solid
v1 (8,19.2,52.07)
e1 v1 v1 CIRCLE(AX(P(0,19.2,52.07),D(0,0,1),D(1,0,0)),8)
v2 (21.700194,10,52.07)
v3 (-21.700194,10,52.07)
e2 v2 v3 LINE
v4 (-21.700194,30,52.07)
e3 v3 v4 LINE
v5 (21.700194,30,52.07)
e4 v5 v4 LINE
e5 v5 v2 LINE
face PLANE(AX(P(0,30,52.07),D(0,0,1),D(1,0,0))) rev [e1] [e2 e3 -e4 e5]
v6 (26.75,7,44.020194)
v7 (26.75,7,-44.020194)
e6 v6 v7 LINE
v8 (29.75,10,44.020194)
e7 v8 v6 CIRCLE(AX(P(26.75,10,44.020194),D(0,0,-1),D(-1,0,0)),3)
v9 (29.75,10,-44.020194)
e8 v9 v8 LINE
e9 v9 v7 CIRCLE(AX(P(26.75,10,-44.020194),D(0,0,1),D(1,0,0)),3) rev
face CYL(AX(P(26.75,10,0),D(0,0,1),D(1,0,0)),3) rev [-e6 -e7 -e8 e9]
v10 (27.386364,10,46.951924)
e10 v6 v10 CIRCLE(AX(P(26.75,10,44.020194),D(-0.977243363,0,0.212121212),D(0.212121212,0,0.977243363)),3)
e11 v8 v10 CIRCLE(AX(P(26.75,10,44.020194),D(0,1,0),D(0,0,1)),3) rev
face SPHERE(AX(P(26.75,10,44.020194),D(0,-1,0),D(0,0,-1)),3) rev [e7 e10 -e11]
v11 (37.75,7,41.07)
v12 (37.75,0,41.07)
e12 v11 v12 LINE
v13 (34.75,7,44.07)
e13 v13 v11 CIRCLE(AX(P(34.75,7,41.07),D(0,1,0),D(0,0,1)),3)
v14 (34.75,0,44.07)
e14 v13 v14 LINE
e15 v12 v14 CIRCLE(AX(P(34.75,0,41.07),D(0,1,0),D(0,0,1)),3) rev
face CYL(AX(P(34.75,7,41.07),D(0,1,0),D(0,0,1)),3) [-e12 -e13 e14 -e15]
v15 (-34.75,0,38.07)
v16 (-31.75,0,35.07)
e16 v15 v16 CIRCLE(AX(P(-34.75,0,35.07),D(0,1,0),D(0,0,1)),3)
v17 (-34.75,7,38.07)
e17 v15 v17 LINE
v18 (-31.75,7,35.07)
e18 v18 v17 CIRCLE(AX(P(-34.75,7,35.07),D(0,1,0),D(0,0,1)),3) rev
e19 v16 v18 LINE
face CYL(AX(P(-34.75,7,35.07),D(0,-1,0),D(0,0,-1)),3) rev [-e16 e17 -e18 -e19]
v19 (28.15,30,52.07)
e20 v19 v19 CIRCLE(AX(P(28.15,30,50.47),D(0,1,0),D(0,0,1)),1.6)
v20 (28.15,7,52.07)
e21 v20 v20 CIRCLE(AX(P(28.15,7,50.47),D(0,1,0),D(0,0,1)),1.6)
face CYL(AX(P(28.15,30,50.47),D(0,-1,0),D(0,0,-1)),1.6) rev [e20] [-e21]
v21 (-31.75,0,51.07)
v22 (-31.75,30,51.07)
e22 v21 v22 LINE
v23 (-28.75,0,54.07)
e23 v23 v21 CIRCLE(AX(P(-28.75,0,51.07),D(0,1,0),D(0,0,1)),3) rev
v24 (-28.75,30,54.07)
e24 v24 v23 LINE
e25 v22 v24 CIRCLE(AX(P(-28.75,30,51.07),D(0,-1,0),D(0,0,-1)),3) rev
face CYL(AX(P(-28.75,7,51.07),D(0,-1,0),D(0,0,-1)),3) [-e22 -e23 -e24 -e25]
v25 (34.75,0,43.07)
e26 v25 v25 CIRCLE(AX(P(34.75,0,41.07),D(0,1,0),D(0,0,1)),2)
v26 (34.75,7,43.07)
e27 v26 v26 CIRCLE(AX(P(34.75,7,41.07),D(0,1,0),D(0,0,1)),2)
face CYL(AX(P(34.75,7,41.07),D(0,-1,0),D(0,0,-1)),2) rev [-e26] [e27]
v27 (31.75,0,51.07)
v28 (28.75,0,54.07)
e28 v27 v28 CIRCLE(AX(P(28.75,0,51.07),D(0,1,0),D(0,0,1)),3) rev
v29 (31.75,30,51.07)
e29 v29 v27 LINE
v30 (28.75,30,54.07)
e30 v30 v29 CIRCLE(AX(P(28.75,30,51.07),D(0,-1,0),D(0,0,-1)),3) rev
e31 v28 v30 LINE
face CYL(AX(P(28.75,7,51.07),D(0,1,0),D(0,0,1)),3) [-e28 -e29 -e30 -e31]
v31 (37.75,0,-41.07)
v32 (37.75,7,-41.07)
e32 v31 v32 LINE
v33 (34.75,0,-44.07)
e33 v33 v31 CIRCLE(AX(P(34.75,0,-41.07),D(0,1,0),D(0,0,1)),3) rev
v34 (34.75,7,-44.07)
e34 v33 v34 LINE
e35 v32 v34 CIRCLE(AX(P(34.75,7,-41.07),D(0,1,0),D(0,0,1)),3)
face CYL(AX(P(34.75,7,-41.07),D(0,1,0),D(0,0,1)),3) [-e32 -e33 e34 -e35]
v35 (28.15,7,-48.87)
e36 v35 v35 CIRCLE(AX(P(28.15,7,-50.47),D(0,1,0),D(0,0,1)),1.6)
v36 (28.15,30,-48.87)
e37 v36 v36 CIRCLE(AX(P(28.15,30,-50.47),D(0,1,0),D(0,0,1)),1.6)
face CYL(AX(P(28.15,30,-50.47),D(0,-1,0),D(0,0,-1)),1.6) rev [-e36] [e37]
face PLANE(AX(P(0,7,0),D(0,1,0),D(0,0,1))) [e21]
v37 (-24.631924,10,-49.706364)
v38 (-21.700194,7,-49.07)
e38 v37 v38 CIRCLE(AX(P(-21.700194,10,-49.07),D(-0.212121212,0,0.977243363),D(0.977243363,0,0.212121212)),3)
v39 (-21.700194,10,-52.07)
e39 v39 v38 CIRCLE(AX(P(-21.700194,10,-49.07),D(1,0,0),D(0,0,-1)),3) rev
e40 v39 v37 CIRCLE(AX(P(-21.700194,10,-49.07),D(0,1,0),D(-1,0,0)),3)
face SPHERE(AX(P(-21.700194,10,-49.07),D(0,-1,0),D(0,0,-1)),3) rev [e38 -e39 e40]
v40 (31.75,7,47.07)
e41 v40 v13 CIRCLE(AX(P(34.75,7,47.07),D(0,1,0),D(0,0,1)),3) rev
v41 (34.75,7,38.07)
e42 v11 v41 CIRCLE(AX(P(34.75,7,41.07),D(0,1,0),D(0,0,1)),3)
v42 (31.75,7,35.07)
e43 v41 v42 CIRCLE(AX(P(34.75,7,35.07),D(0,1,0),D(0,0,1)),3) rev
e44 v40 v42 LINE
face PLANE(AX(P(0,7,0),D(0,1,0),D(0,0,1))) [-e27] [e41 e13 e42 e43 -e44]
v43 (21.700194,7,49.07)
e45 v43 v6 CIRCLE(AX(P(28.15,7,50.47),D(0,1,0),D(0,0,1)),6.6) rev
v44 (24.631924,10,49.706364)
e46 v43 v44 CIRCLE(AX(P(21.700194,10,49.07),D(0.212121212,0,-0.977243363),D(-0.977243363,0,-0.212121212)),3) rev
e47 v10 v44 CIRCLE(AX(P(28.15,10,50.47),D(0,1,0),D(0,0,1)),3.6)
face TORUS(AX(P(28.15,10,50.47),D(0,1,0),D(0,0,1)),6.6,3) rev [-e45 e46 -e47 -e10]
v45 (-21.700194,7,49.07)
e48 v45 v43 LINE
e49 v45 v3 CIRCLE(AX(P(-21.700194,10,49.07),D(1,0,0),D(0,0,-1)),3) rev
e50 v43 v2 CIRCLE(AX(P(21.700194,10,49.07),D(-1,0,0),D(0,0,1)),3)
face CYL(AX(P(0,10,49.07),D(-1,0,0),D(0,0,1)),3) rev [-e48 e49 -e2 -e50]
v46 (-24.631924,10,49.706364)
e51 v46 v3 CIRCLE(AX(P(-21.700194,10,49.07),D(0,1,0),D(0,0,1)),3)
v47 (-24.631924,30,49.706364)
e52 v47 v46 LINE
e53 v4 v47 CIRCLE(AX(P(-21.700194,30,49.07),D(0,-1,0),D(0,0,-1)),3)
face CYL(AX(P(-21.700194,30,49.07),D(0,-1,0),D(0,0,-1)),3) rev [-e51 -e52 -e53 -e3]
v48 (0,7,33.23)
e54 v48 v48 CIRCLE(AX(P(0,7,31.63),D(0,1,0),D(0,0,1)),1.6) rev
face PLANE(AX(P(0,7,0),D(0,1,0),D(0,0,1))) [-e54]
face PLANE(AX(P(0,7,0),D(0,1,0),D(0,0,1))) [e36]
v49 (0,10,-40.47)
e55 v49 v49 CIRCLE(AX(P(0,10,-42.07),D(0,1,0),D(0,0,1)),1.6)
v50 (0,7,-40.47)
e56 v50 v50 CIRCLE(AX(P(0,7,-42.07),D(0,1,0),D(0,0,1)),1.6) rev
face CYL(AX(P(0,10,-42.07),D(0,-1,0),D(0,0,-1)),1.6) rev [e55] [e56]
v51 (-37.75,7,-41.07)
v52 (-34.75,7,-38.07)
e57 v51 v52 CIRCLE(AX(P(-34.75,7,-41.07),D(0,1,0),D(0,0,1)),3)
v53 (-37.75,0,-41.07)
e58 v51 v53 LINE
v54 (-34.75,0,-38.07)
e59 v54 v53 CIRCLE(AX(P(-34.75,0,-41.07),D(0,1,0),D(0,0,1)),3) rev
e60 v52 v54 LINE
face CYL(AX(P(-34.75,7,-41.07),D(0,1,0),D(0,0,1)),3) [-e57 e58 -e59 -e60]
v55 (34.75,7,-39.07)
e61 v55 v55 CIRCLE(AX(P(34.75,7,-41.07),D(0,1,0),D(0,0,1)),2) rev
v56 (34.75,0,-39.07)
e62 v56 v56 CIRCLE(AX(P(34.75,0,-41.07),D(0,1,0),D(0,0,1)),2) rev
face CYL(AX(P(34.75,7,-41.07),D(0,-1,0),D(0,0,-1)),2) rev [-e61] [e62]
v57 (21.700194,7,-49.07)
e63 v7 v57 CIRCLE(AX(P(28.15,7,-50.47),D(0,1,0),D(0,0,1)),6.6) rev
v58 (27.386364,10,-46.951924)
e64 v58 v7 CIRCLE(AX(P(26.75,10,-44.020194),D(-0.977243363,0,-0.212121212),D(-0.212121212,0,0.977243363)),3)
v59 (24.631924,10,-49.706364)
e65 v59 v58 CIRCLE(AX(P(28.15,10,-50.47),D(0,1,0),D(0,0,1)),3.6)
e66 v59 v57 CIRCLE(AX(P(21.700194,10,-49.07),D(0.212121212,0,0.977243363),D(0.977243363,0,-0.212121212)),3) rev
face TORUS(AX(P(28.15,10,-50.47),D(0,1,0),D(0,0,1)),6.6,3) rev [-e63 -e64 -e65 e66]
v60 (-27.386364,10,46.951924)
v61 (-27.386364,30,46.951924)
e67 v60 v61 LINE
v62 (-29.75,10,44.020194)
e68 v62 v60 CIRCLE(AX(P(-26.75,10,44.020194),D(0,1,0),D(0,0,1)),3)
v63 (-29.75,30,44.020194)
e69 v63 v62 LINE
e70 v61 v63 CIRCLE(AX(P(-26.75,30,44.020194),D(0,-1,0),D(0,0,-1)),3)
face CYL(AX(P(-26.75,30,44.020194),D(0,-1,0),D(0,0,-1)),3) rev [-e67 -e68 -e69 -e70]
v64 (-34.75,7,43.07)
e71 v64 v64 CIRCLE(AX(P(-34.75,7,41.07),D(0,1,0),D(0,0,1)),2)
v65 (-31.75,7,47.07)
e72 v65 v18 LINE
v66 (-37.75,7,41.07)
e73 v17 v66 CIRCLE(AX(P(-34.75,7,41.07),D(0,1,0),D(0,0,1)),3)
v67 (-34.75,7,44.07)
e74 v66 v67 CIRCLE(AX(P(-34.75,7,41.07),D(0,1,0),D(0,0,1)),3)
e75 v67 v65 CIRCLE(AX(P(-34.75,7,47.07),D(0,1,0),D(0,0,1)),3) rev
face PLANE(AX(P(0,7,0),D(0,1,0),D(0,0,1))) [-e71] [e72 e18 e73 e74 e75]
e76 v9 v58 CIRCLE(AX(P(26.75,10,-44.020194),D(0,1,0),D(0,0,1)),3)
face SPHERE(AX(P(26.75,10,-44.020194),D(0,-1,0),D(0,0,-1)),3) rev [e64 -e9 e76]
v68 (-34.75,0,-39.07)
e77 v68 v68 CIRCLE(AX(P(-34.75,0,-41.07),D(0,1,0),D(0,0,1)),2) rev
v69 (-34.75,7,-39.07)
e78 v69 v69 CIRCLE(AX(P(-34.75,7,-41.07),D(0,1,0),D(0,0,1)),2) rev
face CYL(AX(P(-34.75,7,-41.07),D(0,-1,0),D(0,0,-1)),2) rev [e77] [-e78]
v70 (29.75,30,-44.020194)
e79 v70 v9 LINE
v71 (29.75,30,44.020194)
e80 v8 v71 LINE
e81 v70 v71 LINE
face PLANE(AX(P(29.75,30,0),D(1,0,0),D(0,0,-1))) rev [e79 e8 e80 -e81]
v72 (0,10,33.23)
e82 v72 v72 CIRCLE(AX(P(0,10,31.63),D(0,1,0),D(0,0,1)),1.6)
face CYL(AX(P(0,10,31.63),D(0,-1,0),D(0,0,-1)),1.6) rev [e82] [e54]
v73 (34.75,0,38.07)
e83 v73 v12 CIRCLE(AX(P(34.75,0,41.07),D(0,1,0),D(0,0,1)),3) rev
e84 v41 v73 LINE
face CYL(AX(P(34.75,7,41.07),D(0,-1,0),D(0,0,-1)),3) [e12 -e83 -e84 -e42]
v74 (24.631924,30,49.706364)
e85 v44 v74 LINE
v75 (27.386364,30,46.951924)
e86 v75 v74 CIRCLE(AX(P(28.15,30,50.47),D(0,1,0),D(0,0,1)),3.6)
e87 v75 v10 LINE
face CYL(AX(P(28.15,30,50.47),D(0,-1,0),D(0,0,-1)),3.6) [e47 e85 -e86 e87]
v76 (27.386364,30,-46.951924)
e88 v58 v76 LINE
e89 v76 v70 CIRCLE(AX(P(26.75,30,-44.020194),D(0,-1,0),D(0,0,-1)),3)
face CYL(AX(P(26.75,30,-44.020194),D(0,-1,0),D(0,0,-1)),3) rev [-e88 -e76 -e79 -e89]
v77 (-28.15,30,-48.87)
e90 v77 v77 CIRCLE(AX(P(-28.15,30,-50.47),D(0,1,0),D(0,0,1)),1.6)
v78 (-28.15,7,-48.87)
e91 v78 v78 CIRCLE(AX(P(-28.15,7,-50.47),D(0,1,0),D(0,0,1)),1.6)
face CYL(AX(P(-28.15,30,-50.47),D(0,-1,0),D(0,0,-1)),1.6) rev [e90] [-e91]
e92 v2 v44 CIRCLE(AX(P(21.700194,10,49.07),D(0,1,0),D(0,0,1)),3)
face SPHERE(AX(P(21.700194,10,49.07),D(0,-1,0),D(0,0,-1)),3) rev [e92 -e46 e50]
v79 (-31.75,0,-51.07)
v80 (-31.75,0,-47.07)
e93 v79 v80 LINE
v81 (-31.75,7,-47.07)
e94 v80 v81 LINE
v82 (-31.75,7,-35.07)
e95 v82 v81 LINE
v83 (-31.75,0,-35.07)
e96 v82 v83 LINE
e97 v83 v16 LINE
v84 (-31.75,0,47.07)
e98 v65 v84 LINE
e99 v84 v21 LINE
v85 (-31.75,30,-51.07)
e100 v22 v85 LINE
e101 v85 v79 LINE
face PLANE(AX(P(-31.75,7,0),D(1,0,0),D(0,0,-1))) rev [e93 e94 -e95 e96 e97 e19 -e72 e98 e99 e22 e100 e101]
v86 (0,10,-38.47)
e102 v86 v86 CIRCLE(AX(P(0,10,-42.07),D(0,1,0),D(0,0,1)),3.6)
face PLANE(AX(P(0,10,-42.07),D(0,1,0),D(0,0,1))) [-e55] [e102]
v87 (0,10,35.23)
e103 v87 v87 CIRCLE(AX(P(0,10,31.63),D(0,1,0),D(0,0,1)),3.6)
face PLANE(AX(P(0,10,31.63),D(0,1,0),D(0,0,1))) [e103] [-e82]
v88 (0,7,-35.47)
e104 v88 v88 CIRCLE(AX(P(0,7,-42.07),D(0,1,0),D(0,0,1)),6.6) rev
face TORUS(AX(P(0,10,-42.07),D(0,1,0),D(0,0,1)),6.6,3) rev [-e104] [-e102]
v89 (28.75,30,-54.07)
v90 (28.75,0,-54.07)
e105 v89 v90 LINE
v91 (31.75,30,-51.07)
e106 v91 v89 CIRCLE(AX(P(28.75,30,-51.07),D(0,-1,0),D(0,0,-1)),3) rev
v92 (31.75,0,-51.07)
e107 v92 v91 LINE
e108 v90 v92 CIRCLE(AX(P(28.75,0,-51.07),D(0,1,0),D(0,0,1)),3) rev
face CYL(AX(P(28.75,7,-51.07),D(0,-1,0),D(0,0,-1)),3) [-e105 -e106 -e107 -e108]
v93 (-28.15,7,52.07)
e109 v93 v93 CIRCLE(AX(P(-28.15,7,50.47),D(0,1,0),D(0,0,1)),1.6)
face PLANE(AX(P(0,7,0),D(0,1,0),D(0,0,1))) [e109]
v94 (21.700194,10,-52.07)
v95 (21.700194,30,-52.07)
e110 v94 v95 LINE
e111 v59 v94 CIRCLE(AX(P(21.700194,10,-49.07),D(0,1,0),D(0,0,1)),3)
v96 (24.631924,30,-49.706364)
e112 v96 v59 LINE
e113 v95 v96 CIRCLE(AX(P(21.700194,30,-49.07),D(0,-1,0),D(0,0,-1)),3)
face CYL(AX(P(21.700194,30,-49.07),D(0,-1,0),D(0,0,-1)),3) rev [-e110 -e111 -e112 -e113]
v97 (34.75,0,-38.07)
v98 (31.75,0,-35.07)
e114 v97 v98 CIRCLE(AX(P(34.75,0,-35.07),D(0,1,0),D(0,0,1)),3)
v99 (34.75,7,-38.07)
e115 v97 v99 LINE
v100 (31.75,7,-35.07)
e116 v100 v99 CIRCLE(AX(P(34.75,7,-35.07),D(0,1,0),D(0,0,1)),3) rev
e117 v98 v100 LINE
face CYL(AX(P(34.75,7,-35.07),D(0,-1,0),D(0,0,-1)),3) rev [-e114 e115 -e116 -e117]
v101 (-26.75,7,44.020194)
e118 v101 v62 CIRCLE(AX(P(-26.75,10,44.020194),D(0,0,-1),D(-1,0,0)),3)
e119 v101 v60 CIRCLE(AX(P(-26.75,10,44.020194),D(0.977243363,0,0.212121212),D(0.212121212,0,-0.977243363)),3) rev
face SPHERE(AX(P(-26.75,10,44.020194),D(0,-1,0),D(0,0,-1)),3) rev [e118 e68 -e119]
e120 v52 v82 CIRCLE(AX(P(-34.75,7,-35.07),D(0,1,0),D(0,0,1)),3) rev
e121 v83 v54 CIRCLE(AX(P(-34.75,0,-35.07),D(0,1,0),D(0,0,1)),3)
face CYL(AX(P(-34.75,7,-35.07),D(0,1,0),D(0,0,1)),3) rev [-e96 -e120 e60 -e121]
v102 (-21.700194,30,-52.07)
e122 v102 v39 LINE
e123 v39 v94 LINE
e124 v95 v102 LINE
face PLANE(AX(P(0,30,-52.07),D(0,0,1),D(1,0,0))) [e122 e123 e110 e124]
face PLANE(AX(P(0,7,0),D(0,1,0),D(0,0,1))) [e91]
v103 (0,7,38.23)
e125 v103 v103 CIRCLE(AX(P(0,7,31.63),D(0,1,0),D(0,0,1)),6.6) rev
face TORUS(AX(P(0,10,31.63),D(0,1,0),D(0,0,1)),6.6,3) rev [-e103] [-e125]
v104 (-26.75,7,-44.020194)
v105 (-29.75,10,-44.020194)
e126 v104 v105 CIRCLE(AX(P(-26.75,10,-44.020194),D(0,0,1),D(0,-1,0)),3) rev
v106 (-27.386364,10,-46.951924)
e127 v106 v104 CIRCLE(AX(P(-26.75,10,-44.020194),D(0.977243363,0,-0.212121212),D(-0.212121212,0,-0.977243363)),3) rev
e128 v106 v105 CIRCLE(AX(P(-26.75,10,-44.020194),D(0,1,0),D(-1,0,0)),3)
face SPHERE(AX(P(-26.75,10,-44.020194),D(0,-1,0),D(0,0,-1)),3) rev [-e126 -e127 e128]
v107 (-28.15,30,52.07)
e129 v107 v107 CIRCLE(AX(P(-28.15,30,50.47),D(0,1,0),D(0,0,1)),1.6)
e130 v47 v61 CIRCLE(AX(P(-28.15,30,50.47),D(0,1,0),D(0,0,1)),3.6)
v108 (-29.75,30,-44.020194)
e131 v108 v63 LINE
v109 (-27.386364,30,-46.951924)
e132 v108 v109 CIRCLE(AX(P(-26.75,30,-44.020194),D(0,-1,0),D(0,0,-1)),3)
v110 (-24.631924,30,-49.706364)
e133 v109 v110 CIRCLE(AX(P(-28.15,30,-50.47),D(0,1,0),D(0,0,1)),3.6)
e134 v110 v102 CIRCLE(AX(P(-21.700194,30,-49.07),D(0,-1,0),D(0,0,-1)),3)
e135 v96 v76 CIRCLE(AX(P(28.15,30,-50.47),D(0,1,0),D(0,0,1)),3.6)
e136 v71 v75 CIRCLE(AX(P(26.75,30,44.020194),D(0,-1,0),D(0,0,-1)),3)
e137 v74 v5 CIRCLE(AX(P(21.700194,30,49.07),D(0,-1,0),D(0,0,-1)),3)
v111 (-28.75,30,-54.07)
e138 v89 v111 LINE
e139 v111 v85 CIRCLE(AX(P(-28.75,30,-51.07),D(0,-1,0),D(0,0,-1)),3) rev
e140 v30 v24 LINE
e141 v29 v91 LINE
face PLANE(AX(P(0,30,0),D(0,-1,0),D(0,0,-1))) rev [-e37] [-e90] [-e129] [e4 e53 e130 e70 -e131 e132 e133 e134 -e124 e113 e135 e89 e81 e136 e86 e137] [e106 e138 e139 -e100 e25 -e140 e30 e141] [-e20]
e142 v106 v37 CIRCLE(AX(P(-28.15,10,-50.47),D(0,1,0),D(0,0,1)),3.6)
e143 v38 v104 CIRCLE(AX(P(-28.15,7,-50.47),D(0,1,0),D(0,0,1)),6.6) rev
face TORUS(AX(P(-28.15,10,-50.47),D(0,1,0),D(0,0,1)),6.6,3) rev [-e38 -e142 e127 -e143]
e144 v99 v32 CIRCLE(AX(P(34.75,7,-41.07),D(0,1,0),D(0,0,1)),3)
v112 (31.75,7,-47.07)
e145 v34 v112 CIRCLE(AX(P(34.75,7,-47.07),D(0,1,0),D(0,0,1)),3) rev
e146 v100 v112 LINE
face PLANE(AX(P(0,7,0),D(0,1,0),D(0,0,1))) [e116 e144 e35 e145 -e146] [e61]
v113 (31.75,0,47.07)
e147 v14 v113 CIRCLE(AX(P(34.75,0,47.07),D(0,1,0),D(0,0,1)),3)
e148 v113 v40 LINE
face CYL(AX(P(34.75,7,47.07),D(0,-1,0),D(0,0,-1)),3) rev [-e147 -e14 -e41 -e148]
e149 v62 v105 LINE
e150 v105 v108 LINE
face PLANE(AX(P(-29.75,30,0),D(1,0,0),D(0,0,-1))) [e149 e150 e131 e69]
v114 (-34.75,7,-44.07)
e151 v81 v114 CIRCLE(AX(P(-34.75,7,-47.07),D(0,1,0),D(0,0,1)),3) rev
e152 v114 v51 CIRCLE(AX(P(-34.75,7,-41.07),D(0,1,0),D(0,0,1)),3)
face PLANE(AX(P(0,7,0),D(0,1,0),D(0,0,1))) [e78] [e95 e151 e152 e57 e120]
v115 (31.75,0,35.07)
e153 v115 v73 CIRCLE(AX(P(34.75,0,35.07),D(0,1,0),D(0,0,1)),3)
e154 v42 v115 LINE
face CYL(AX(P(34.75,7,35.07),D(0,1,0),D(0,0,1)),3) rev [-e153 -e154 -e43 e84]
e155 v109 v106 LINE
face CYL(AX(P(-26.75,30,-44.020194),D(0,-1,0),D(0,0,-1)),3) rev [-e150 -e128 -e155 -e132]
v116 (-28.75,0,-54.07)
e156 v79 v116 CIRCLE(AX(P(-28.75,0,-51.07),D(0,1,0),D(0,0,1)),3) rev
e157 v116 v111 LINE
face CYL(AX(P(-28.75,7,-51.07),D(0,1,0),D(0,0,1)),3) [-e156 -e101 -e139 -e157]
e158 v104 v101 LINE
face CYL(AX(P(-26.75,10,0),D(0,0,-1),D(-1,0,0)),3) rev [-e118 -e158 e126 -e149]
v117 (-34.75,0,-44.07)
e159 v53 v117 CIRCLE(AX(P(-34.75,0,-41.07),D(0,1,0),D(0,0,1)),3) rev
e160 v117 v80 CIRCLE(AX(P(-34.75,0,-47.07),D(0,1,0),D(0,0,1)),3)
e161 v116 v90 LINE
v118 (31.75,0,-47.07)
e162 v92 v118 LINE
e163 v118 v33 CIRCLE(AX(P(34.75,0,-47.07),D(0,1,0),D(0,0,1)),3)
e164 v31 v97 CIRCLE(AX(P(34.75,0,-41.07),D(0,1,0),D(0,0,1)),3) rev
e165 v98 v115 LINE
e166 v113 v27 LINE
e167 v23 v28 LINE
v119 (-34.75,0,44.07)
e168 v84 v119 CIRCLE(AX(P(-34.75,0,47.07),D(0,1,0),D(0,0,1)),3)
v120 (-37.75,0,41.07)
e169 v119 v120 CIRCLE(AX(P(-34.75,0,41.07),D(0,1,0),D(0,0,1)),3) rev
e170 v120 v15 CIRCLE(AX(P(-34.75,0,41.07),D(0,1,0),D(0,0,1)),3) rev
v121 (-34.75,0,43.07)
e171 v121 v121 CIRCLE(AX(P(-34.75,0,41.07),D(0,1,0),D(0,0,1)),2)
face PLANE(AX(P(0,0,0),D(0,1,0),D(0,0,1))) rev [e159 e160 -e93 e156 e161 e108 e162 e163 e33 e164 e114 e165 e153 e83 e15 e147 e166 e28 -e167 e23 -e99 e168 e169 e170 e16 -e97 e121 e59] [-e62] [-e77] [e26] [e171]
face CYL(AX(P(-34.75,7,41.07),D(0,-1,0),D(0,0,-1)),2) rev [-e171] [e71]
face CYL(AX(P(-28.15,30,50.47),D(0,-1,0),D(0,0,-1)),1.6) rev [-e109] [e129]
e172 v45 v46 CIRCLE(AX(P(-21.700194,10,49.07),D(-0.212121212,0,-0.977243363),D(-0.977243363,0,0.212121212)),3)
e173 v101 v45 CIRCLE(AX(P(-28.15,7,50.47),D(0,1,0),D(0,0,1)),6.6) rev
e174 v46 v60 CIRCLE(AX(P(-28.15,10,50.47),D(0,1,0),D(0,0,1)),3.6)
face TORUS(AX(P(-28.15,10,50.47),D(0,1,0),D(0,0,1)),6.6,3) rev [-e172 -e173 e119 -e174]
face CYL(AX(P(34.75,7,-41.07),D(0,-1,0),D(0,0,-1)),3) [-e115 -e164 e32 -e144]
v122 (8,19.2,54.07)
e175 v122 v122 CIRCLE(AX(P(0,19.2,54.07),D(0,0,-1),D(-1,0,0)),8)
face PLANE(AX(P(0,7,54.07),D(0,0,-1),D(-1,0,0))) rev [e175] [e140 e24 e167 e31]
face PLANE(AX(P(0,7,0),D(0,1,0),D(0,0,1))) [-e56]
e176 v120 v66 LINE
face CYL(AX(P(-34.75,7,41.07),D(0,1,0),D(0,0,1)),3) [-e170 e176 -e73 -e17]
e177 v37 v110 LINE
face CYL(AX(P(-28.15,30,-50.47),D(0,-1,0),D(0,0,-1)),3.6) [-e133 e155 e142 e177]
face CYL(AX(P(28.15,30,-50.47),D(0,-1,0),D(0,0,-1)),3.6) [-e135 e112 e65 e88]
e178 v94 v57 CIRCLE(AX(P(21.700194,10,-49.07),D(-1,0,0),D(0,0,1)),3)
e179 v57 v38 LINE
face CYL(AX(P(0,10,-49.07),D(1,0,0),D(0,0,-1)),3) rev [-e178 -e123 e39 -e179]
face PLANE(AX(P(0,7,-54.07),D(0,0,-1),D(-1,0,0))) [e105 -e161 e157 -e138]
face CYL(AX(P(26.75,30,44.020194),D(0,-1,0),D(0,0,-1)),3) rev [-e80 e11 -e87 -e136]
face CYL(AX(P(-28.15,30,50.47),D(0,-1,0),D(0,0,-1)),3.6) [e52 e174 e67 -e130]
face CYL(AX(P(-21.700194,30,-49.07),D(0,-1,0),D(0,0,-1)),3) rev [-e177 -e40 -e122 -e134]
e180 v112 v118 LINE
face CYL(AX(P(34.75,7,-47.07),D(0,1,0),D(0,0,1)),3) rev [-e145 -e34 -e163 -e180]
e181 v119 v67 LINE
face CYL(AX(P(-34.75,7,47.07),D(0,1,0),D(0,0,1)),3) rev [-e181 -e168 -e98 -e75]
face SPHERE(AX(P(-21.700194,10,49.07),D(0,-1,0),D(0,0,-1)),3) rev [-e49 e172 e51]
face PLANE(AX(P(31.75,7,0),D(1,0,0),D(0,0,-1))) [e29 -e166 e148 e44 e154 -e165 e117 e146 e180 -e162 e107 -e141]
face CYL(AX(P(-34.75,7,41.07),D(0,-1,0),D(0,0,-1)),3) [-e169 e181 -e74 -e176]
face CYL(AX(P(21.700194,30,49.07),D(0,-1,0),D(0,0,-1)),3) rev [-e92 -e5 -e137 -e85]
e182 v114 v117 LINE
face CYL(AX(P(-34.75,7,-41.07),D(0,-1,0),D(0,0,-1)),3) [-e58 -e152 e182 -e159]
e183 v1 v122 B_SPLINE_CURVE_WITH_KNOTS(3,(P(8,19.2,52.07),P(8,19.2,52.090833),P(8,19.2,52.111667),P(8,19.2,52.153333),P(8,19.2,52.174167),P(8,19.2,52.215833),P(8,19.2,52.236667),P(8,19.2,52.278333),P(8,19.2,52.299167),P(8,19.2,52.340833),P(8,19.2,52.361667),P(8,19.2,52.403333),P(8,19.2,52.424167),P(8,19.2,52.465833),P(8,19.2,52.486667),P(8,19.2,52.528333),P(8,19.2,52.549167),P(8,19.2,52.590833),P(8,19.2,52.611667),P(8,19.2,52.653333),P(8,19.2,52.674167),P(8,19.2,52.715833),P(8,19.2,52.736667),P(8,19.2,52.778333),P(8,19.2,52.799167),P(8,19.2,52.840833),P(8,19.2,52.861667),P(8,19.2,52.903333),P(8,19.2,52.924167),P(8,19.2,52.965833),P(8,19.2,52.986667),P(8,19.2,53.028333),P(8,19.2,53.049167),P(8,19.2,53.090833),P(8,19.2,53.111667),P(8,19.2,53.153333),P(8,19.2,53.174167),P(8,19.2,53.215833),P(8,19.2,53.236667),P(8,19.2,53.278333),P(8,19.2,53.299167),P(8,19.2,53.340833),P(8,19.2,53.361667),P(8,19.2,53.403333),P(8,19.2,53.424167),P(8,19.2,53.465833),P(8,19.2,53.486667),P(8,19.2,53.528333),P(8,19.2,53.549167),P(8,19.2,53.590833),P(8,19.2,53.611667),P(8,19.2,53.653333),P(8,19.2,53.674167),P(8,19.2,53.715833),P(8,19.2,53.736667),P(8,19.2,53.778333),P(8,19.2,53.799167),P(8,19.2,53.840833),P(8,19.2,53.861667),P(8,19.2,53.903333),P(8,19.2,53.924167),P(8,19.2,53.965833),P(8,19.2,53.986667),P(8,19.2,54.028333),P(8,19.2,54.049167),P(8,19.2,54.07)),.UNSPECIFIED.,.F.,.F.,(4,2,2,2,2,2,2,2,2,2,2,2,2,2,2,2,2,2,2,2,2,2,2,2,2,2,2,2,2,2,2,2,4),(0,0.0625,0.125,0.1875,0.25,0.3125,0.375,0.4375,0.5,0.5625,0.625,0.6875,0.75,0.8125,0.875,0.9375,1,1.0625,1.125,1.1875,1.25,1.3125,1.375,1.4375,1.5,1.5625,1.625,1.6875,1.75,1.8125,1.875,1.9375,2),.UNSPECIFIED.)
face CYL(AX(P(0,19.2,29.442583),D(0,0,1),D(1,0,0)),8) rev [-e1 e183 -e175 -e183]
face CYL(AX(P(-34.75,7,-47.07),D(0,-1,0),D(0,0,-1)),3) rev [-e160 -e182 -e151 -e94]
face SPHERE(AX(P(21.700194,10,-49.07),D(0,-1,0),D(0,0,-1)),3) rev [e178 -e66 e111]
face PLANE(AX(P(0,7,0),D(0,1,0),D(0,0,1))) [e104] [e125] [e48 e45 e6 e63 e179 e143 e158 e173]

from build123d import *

# Parameters (mm, degrees)
SKETCH1_R          = 2
BASE_DEPTH         = 7
WALLS_START        = 7
SKETCH1_3_R        = 1.6
WALLS_DEPTH        = 23
STANDOFFS_START    = 7
SKETCH1_4_R        = 3.6
SKETCH1_4_R_2      = 1.6
STANDOFFS_DEPTH    = 3
INTERNAL_FILLET_R  = 3
EXTERNAL_FILLET_R  = 3
SKETCH2_R          = 8
CUT_EXTRUDE1_DEPTH = 2


with BuildPart() as part:
    # Sketch1 → BASE (new body)
    with BuildSketch(Plane(origin=(0, 0, 0), x_dir=(1, 0, 0), z_dir=(0, 1, 0))):
        Polygon((-31.75, -38.07), (-37.75, -38.07), (-37.75, -44.07), (-31.75, -44.07), (-31.75, -54.07), (31.75, -54.07), (31.75, -44.07), (37.75, -44.07), (37.75, -38.07), (31.75, -38.07), (31.75, 38.07), (37.75, 38.07), (37.75, 44.07), (31.75, 44.07), (31.75, 54.07), (-31.75, 54.07), (-31.75, 44.07), (-37.75, 44.07), (-37.75, 38.07), (-31.75, 38.07), align=None)
        with Locations(Location((-34.75, -41.07, 0), (0, 0, 270))):
            Circle(SKETCH1_R, mode=Mode.SUBTRACT)
        with Locations(Location((-34.75, 41.07, 0), (0, 0, 270))):
            Circle(SKETCH1_R, mode=Mode.SUBTRACT)
        with Locations(Location((34.75, -41.07, 0), (0, 0, 270))):
            Circle(SKETCH1_R, mode=Mode.SUBTRACT)
        with Locations(Location((34.75, 41.07, 0), (0, 0, 270))):
            Circle(SKETCH1_R, mode=Mode.SUBTRACT)
    extrude(amount=BASE_DEPTH)

    # Sketch1<3> → Walls (add)
    with BuildSketch(Plane(origin=(0, 0, 0), x_dir=(1, 0, 0), z_dir=(0, 1, 0)).offset(WALLS_START)):
        Polygon((-31.75, 38.07), (-31.75, -38.07), (-31.75, -44.07), (-31.75, -54.07), (31.75, -54.07), (31.75, -44.07), (31.75, -38.07), (31.75, 38.07), (31.75, 44.07), (31.75, 54.07), (-31.75, 54.07), (-31.75, 44.07), align=None)
        with Locations(Location((-28.15, -50.47, 0), (0, 0, 270))):
            Circle(SKETCH1_3_R, mode=Mode.SUBTRACT)
        with BuildLine():
            Line((24.925096901, -52.07), (-24.925096901, -52.07))
            ThreePointArc((-24.925096901, -52.07), (-25.604415588, -47.924415588), (-29.75, -47.245096901))
            Line((-29.75, -47.245096901), (-29.75, 47.245096901))
            ThreePointArc((-29.75, 47.245096901), (-25.604415588, 47.924415588), (-24.925096901, 52.07))
            Line((-24.925096901, 52.07), (24.925096901, 52.07))
            ThreePointArc((24.925096901, 52.07), (25.604415588, 47.924415588), (29.75, 47.245096901))
            Line((29.75, 47.245096901), (29.75, -47.245096901))
            ThreePointArc((29.75, -47.245096901), (25.604415588, -47.924415588), (24.925096901, -52.07))
        make_face(mode=Mode.SUBTRACT)
        with Locations(Location((28.15, -50.47, 0), (0, 0, 270))):
            Circle(SKETCH1_3_R, mode=Mode.SUBTRACT)
        with Locations(Location((-28.15, 50.47, 0), (0, 0, 270))):
            Circle(SKETCH1_3_R, mode=Mode.SUBTRACT)
        with Locations(Location((28.15, 50.47, 0), (0, 0, 270))):
            Circle(SKETCH1_3_R, mode=Mode.SUBTRACT)
    extrude(amount=WALLS_DEPTH)

    # Sketch1<4> → Standoffs (add)
    # profile 1 of 2: a face of its own
    with BuildSketch(Plane(origin=(0, 0, 0), x_dir=(1, 0, 0), z_dir=(0, 1, 0)).offset(STANDOFFS_START)):
        with Locations(Location((0, 42.07, 0), (0, 0, 270))):
            Circle(SKETCH1_4_R)
        with Locations(Location((0, 42.07, 0), (0, 0, 270))):
            Circle(SKETCH1_4_R_2, mode=Mode.SUBTRACT)
    # profile 2 of 2: a face of its own
    with BuildSketch(Plane(origin=(0, 0, 0), x_dir=(1, 0, 0), z_dir=(0, 1, 0)).offset(STANDOFFS_START)):
        with Locations(Location((0, -31.63, 0), (0, 0, 270))):
            Circle(SKETCH1_4_R)
        with Locations(Location((0, -31.63, 0), (0, 0, 270))):
            Circle(SKETCH1_4_R_2, mode=Mode.SUBTRACT)
    extrude(amount=STANDOFFS_DEPTH)

    # Internal Fillet
    internal_fillet_edges = [part.edges().sort_by_distance(p)[0] for p in [
        (-29.75, 18.5, 47.245096901),
        (-25.604415588, 7, 47.924415588),
        (-24.925096901, 18.5, 52.07),
        (0, 7, 52.07),
        (24.925096901, 18.5, 52.07),
        (25.604415588, 7, 47.924415588),
        (29.75, 18.5, 47.245096901),
        (29.75, 7, 0),
        (29.75, 18.5, -47.245096901),
        (25.604415588, 7, -47.924415588),
        (24.925096901, 18.5, -52.07),
        (-24.925096901, 18.5, -52.07),
        (-25.604415588, 7, -47.924415588),
        (-29.75, 18.5, -47.245096901),
        (0, 7, -45.67),
        (0, 7, 28.03),
        (-29.75, 7, 0),
        (0, 7, -52.07),
    ]]
    fillet(internal_fillet_edges, radius=INTERNAL_FILLET_R - 0.0001)  # a hair under: the kernel refuses the full size

    # External Fillet
    external_fillet_edges = [part.edges().sort_by_distance(p)[0] for p in [
        (-31.75, 15, 54.07),
        (-31.75, 15, -54.07),
        (31.75, 15, -54.07),
        (31.75, 15, 54.07),
        (31.75, 3.5, 38.07),
        (37.75, 3.5, 38.07),
        (37.75, 3.5, 44.07),
        (31.75, 3.5, 44.07),
        (31.75, 3.5, -38.07),
        (31.75, 3.5, -44.07),
        (37.75, 3.5, -38.07),
        (37.75, 3.5, -44.07),
        (-31.75, 3.5, -38.07),
        (-37.75, 3.5, -38.07),
        (-37.75, 3.5, -44.07),
        (-31.75, 3.5, -44.07),
        (-31.75, 3.5, 38.07),
        (-37.75, 3.5, 38.07),
        (-37.75, 3.5, 44.07),
        (-31.75, 3.5, 44.07),
    ]]
    fillet(external_fillet_edges, radius=EXTERNAL_FILLET_R - 0.0001)  # a hair under: the kernel refuses the full size

    # Sketch2 → Cut-Extrude1 (cut)
    with BuildSketch(Plane(origin=(27.4, 0, 54.07), x_dir=(-1, 0, 0), z_dir=(0, 0, -1))):
        with Locations(Location((27.4, 19.200000012, 0), (0, 0, 180))):
            Circle(SKETCH2_R)
    extrude(amount=CUT_EXTRUDE1_DEPTH, mode=Mode.SUBTRACT)


solid = part.part
